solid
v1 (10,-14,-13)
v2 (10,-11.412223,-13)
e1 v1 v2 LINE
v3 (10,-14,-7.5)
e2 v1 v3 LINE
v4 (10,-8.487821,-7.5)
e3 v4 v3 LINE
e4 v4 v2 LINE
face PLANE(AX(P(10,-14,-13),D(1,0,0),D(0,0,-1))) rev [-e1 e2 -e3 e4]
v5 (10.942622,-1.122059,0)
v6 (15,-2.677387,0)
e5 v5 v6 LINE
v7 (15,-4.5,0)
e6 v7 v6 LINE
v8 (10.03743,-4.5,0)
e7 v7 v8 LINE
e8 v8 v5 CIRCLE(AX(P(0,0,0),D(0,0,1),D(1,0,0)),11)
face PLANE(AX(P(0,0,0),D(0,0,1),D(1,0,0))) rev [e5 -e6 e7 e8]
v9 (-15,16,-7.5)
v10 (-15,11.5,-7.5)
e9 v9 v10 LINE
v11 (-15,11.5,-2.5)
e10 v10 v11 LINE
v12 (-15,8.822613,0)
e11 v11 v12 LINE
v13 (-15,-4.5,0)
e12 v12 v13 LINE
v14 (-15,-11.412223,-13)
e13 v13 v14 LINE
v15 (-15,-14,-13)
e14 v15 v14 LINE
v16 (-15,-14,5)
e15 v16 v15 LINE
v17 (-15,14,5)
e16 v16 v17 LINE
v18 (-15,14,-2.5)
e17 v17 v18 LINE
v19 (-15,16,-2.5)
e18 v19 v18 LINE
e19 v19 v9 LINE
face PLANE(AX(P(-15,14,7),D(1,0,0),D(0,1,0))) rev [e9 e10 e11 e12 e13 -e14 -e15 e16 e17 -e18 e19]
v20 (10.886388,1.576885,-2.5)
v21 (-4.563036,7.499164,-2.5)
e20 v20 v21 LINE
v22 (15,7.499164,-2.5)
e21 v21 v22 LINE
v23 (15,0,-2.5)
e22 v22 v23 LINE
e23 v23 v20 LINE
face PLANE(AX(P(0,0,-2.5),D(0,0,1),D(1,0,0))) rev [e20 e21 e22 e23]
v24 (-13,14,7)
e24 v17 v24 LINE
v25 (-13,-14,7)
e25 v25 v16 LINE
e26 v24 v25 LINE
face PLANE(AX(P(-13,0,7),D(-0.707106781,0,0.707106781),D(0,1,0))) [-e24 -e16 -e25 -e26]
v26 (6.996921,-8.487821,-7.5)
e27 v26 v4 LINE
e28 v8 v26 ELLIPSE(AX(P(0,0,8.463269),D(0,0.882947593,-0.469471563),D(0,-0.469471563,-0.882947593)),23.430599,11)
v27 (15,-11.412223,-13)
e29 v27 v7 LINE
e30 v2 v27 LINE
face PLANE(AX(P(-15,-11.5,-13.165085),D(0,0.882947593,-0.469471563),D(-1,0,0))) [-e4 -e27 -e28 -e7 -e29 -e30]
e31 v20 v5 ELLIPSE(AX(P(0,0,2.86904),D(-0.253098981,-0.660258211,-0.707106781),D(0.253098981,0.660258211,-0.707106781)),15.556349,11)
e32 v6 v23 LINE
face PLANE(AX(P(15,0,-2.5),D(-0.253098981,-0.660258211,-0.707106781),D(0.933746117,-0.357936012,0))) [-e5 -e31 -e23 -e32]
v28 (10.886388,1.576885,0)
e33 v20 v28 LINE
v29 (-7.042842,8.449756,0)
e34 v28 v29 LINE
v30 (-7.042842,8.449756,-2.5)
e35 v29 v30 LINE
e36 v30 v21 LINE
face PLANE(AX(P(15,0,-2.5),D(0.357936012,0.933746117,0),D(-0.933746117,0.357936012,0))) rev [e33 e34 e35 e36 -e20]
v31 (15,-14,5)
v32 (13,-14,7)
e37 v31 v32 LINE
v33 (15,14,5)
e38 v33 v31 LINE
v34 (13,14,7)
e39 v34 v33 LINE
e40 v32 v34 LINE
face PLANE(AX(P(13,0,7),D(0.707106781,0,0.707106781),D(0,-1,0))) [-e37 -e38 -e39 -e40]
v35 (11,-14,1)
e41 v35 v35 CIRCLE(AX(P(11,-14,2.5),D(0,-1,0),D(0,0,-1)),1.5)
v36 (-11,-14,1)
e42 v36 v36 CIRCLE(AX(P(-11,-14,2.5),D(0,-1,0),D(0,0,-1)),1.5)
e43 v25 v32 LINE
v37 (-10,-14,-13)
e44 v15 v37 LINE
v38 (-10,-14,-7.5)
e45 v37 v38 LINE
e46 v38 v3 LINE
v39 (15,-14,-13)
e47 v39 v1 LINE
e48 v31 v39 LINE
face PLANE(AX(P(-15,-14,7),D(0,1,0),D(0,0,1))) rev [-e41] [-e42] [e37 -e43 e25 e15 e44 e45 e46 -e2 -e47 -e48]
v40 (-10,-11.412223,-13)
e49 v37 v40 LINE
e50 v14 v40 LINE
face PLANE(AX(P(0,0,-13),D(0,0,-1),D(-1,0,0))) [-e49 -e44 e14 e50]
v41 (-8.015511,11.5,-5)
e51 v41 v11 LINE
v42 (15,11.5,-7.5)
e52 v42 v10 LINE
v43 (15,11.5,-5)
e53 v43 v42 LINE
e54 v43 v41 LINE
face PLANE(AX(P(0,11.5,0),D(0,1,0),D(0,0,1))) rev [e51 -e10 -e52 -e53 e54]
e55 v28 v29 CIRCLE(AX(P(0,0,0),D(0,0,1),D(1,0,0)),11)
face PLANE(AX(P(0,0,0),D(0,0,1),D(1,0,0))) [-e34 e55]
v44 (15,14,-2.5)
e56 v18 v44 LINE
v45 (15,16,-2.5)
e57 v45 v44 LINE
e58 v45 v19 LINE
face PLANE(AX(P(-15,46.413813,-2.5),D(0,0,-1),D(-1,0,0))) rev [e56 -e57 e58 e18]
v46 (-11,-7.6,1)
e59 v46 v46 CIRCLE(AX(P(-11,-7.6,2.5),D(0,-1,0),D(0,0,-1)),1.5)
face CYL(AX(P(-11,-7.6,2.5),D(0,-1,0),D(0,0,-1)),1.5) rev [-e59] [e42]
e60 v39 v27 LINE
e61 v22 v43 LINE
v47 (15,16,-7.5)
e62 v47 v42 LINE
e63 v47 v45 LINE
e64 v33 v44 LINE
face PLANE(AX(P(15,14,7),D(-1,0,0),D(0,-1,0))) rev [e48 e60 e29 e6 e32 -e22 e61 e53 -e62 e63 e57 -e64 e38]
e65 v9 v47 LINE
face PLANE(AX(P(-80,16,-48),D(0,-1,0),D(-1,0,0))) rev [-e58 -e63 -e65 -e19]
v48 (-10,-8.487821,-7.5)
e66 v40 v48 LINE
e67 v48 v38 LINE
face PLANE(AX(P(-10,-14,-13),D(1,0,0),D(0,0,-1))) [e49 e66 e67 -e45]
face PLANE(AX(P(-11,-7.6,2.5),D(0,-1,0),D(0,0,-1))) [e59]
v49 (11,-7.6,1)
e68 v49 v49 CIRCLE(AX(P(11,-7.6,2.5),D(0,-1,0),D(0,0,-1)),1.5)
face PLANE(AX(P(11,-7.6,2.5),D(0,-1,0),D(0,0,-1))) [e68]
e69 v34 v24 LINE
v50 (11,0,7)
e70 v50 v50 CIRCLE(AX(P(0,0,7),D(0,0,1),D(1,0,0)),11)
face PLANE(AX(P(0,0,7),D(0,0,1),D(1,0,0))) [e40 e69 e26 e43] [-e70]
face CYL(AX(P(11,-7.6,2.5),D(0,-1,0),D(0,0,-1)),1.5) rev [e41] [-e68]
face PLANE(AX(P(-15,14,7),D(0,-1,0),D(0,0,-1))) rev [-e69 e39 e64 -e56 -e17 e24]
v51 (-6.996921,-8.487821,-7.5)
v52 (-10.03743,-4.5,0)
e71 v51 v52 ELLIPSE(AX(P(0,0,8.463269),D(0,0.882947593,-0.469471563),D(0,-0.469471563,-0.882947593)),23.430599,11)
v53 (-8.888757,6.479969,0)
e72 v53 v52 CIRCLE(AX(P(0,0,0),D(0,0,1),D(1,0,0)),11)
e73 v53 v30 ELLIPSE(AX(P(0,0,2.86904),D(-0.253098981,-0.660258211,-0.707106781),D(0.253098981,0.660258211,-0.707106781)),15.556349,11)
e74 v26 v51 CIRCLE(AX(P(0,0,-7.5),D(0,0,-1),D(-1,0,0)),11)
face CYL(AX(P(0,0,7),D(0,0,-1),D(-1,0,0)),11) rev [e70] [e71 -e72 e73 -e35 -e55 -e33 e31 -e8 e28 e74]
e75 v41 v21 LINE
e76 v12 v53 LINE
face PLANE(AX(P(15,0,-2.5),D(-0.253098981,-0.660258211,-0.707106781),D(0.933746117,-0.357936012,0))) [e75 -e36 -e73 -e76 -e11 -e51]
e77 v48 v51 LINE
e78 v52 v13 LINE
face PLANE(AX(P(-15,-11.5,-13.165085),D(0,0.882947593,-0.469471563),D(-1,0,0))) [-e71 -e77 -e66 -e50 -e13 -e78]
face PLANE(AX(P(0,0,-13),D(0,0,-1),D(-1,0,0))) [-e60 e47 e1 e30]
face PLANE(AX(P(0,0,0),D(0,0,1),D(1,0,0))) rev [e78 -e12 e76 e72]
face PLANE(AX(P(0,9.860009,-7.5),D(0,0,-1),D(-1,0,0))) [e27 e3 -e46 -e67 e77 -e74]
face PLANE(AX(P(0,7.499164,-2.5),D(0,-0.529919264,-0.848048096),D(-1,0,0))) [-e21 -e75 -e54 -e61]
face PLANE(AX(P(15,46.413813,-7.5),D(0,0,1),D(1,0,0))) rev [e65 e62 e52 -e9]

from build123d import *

# Parameters (mm, degrees)
SKETCH1_W           = 30
SKETCH1_H           = 28
SKETCH1_R           = 11
BOSS_EXTRUDE1_DEPTH = 7
SKETCH2_W           = 5
SKETCH2_H           = 2.5
BOSS_EXTRUDE2_DEPTH = 13
CHAMFER2_SIZE       = 2
BOSS_EXTRUDE6_DEPTH = 2.5
CHAMFER3_SIZE       = 2
CHAMFER4_SIZE       = 2
BOSS_EXTRUDE4_DEPTH = 2.5
CHAMFER6_SIZE       = 2.5
CHAMFER7_SIZE       = 7
CHAMFER7_SIZE_2     = 13.165085257
SKETCH7_R           = 1.5
CUT_EXTRUDE2_DEPTH  = 6.4
BOSS_EXTRUDE7_START = -2.5
SKETCH8_W           = 30
SKETCH8_H           = 5
BOSS_EXTRUDE7_DEPTH = 4.5
CHAMFER8_SIZE       = 4.000836323
CHAMFER8_SIZE_2     = 2.5


with BuildPart() as part:
    # Sketch1 → Boss-Extrude1 (new body)
    with BuildSketch(Plane.XY):
        Rectangle(SKETCH1_W, SKETCH1_H)
        Circle(SKETCH1_R, mode=Mode.SUBTRACT)
    extrude(amount=BOSS_EXTRUDE1_DEPTH)

    # Sketch2 → Boss-Extrude2 (add)
    with BuildSketch(Plane(origin=(0, 0, 0), x_dir=(-1, 0, 0), z_dir=(0, 0, -1))):
        with Locations((-12.5, -12.75)):
            Rectangle(SKETCH2_W, SKETCH2_H)
        with Locations((12.5, -12.75)):
            Rectangle(SKETCH2_W, SKETCH2_H)
    extrude(amount=BOSS_EXTRUDE2_DEPTH)

    # Chamfer2
    chamfer2_edges = [part.edges().sort_by_distance(p)[0] for p in [
        (-10, -12.75, 0),
        (10, -12.75, 0),
    ]]
    chamfer(chamfer2_edges, length=CHAMFER2_SIZE)

    # Sketch5 → Boss-Extrude6 (add)
    with BuildSketch(Plane.XZ.offset(14)):
        Polygon((-10, -2), (-10, -7.5), (10, -7.5), (10, -2), (8, 0), (-8, 0), align=None)
    extrude(amount=-BOSS_EXTRUDE6_DEPTH)

    # Chamfer3
    chamfer3_edges = [part.edges().sort_by_distance(p)[0] for p in [
        (15, 0, 7),
    ]]
    chamfer(chamfer3_edges, length=CHAMFER3_SIZE)

    # Chamfer4
    chamfer4_edges = [part.edges().sort_by_distance(p)[0] for p in [
        (-15, 0, 7),
    ]]
    chamfer(chamfer4_edges, length=CHAMFER4_SIZE)

    # Sketch4 → Boss-Extrude4 (add)
    with BuildSketch(Plane(origin=(0, 0, 0), x_dir=(-1, 0, 0), z_dir=(0, 0, -1))):
        Polygon((-15, 0), (15, 11.5), (15, 14), (-15, 14), align=None)
    extrude(amount=BOSS_EXTRUDE4_DEPTH)

    # Chamfer6
    # the kernel refuses this chamfer: 2.5 mm, written as the material it adds along each edge
    with BuildSketch(Plane(origin=(21.003247512, -2.30124488, 0), x_dir=(-0.3578006820796162, -0.9333930836859554, 0.02749587661058638), z_dir=(-0.9337461173020497, 0.35793601163245237, 0))) as chamfer6_piece_1_section:
        Polygon((CHAMFER6_SIZE * 0.999621916911, -CHAMFER6_SIZE * 0.0274958766106), (-CHAMFER6_SIZE * 0.0274958766106, -CHAMFER6_SIZE * 0.999621916911), (0, 0), align=None)
    chamfer6_piece_1 = extrude(amount=17.263908412, mode=Mode.PRIVATE)
    chamfer6_piece_1 = chamfer6_piece_1 - Plane(origin=(0, 0, -0.835393566), x_dir=(1, 0, 0), z_dir=(0, 0, -1)) * Cylinder(11, 45, mode=Mode.PRIVATE)
    chamfer6_piece_1 = split(chamfer6_piece_1, bisect_by=Plane(origin=(15, -0.113968884, -0.835393566), z_dir=(-1, 0, 0)), keep=Keep.TOP, mode=Mode.PRIVATE)
    add(chamfer6_piece_1)
    with BuildSketch(Plane(origin=(-1.03959441, 6.148511191, 0), x_dir=(-0.35780068207961624, -0.9333930836859554, 0.02749587661058638), z_dir=(-0.9337461173020497, 0.35793601163245237, 0))) as chamfer6_piece_2_section:
        Polygon((CHAMFER6_SIZE * 0.999621916911, -CHAMFER6_SIZE * 0.0274958766106), (-CHAMFER6_SIZE * 0.0274958766106, -CHAMFER6_SIZE * 0.999621916911), (0, 0), align=None)
    chamfer6_piece_2 = extrude(amount=21.380172546, mode=Mode.PRIVATE)
    chamfer6_piece_2 = chamfer6_piece_2 - Plane(origin=(0, 0, -0.851534645), x_dir=(1, 0, 0), z_dir=(0, 0, -1)) * Cylinder(11, 53, mode=Mode.PRIVATE)
    chamfer6_piece_2 = split(chamfer6_piece_2, bisect_by=Plane(origin=(-15, 9.244820467, -0.851534645), z_dir=(1, 0, 0)), keep=Keep.TOP, mode=Mode.PRIVATE)
    add(chamfer6_piece_2)

    # Chamfer7
    # the kernel refuses this chamfer: 13.165085257, 7 mm, written as the material it adds along each edge
    with BuildSketch(Plane(origin=(-15, -11.5, 0), x_dir=(0, 0.9979482451756082, 0.06402577567608186), z_dir=(1, 0, 0))) as chamfer7_piece_1_section:
        Polygon((CHAMFER7_SIZE * 0.997948245176, -CHAMFER7_SIZE * 0.0640257756761), (-CHAMFER7_SIZE_2 * 0.0640257756781, -CHAMFER7_SIZE_2 * 0.997948245208), (0, 0), align=None)
    chamfer7_piece_1 = extrude(amount=30, mode=Mode.PRIVATE)
    chamfer7_piece_1 = chamfer7_piece_1 - Plane(origin=(0, 0, -3.073682767), x_dir=(1, 0, 0), z_dir=(0, 0, -1)) * Cylinder(11, 113, mode=Mode.PRIVATE)
    chamfer7_piece_1 = split(chamfer7_piece_1, bisect_by=Plane(origin=(-10, -8.887755394, -3.073682767), z_dir=(-1, 0, 0)), keep=Keep.TOP, mode=Mode.PRIVATE)
    chamfer7_piece_1 = split(chamfer7_piece_1, bisect_by=Plane(origin=(-12.500128058, -8.887755394, -7.5), z_dir=(0, 0, 1)), keep=Keep.TOP, mode=Mode.PRIVATE)
    add(chamfer7_piece_1)
    with BuildSketch(Plane(origin=(-15, -11.5, 0), x_dir=(0, 0.9979482451756082, 0.06402577567608186), z_dir=(1, 0, 0))) as chamfer7_piece_2_section:
        Polygon((CHAMFER7_SIZE * 0.997948245176, -CHAMFER7_SIZE * 0.0640257756761), (-CHAMFER7_SIZE_2 * 0.0640257756781, -CHAMFER7_SIZE_2 * 0.997948245208), (0, 0), align=None)
    chamfer7_piece_2 = extrude(amount=30, mode=Mode.PRIVATE)
    chamfer7_piece_2 = split(chamfer7_piece_2, bisect_by=Plane(origin=(-10, -10.721530873, -9.597564575), z_dir=(-1, 0, 0)), keep=Keep.TOP, mode=Mode.PRIVATE)
    chamfer7_piece_2 = split(chamfer7_piece_2, bisect_by=Plane(origin=(-12.5, -10.721530873, -7.5), z_dir=(0, 0, -1)), keep=Keep.TOP, mode=Mode.PRIVATE)
    chamfer7_piece_2 = split(chamfer7_piece_2, bisect_by=Plane(origin=(-12.5, -10.721530873, -13), z_dir=(0, 0, 1)), keep=Keep.TOP, mode=Mode.PRIVATE)
    add(chamfer7_piece_2)
    with BuildSketch(Plane(origin=(-15, -11.5, 0), x_dir=(0, 0.9979482451756082, 0.06402577567608186), z_dir=(1, 0, 0))) as chamfer7_piece_3_section:
        Polygon((CHAMFER7_SIZE * 0.997948245176, -CHAMFER7_SIZE * 0.0640257756761), (-CHAMFER7_SIZE_2 * 0.0640257756781, -CHAMFER7_SIZE_2 * 0.997948245208), (0, 0), align=None)
    chamfer7_piece_3 = extrude(amount=30, mode=Mode.PRIVATE)
    chamfer7_piece_3 = chamfer7_piece_3 - Plane(origin=(0, 0, -3.793876077), x_dir=(1, 0, 0), z_dir=(0, 0, -1)) * Cylinder(11, 113, mode=Mode.PRIVATE)
    chamfer7_piece_3 = split(chamfer7_piece_3, bisect_by=Plane(origin=(-10, -6.598719884, -3.793876077), z_dir=(1, 0, 0)), keep=Keep.TOP, mode=Mode.PRIVATE)
    chamfer7_piece_3 = split(chamfer7_piece_3, bisect_by=Plane(origin=(-9.499486782, -6.598719884, -7.5), z_dir=(0, 0, 1)), keep=Keep.TOP, mode=Mode.PRIVATE)
    chamfer7_piece_3 = split(chamfer7_piece_3, bisect_by=Plane(origin=(10, -6.598719884, -3.793876077), z_dir=(-1, 0, 0)), keep=Keep.TOP, mode=Mode.PRIVATE)
    add(chamfer7_piece_3)
    with BuildSketch(Plane(origin=(-15, -11.5, 0), x_dir=(0, 0.9979482451756082, 0.06402577567608186), z_dir=(1, 0, 0))) as chamfer7_piece_4_section:
        Polygon((CHAMFER7_SIZE * 0.997948245176, -CHAMFER7_SIZE * 0.0640257756761), (-CHAMFER7_SIZE_2 * 0.0640257756781, -CHAMFER7_SIZE_2 * 0.997948245208), (0, 0), align=None)
    chamfer7_piece_4 = extrude(amount=30, mode=Mode.PRIVATE)
    chamfer7_piece_4 = split(chamfer7_piece_4, bisect_by=Plane(origin=(12.5, -10.721530873, -7.5), z_dir=(0, 0, -1)), keep=Keep.TOP, mode=Mode.PRIVATE)
    chamfer7_piece_4 = split(chamfer7_piece_4, bisect_by=Plane(origin=(10, -10.721530873, -9.597564575), z_dir=(1, 0, 0)), keep=Keep.TOP, mode=Mode.PRIVATE)
    chamfer7_piece_4 = split(chamfer7_piece_4, bisect_by=Plane(origin=(12.5, -10.721530873, -13), z_dir=(0, 0, 1)), keep=Keep.TOP, mode=Mode.PRIVATE)
    add(chamfer7_piece_4)
    with BuildSketch(Plane(origin=(-15, -11.5, 0), x_dir=(0, 0.9979482451756082, 0.06402577567608186), z_dir=(1, 0, 0))) as chamfer7_piece_5_section:
        Polygon((CHAMFER7_SIZE * 0.997948245176, -CHAMFER7_SIZE * 0.0640257756761), (-CHAMFER7_SIZE_2 * 0.0640257756781, -CHAMFER7_SIZE_2 * 0.997948245208), (0, 0), align=None)
    chamfer7_piece_5 = extrude(amount=30, mode=Mode.PRIVATE)
    chamfer7_piece_5 = chamfer7_piece_5 - Plane(origin=(0, 0, -3.073682766), x_dir=(1, 0, 0), z_dir=(0, 0, -1)) * Cylinder(11, 113, mode=Mode.PRIVATE)
    chamfer7_piece_5 = split(chamfer7_piece_5, bisect_by=Plane(origin=(12.500128057, -8.887755394, -7.5), z_dir=(0, 0, 1)), keep=Keep.TOP, mode=Mode.PRIVATE)
    chamfer7_piece_5 = split(chamfer7_piece_5, bisect_by=Plane(origin=(10, -8.887755394, -3.073682766), z_dir=(1, 0, 0)), keep=Keep.TOP, mode=Mode.PRIVATE)
    add(chamfer7_piece_5)

    # Sketch7 → Cut-Extrude2 (cut)
    with BuildSketch(Plane.XZ.offset(14)):
        with Locations(Location((-11, 2.5, 0), (0, 0, 270))):
            Circle(SKETCH7_R)
        with Locations(Location((11, 2.5, 0), (0, 0, 270))):
            Circle(SKETCH7_R)
    extrude(amount=-CUT_EXTRUDE2_DEPTH, mode=Mode.SUBTRACT)

    # Sketch8 → Boss-Extrude7 (add)
    with BuildSketch(Plane(origin=(0, 14, 0), x_dir=(1, 0, 0), z_dir=(0, 1, 0)).offset(BOSS_EXTRUDE7_START)):
        with Locations((0, 5)):
            Rectangle(SKETCH8_W, SKETCH8_H)
    extrude(amount=BOSS_EXTRUDE7_DEPTH)

    # Chamfer8
    # the kernel refuses this chamfer: 4.000836323, 2.5 mm, written as the material it adds along each edge
    with BuildSketch(Plane(origin=(-25.343554005, 11.5, -2.5), x_dir=(0, -0.9997899140358645, 0.02049701910421793), z_dir=(1, 0, 0))) as chamfer8_piece_1_section:
        Polygon((CHAMFER8_SIZE * 0.999789913937, CHAMFER8_SIZE * 0.0204970191022), (-CHAMFER8_SIZE_2 * 0.0204970191042, CHAMFER8_SIZE_2 * 0.999789914036), (0, 0), align=None)
    chamfer8_piece_1 = extrude(amount=40.343554005, mode=Mode.PRIVATE)
    chamfer8_piece_1 = split(chamfer8_piece_1, bisect_by=Plane(origin=(2.975759377, 8.202968449, -5.855581208), z_dir=(0.25309898105600476, 0.6602582114512465, 0.707106781186274)), keep=Keep.TOP, mode=Mode.PRIVATE)
    add(chamfer8_piece_1)


solid = part.part
